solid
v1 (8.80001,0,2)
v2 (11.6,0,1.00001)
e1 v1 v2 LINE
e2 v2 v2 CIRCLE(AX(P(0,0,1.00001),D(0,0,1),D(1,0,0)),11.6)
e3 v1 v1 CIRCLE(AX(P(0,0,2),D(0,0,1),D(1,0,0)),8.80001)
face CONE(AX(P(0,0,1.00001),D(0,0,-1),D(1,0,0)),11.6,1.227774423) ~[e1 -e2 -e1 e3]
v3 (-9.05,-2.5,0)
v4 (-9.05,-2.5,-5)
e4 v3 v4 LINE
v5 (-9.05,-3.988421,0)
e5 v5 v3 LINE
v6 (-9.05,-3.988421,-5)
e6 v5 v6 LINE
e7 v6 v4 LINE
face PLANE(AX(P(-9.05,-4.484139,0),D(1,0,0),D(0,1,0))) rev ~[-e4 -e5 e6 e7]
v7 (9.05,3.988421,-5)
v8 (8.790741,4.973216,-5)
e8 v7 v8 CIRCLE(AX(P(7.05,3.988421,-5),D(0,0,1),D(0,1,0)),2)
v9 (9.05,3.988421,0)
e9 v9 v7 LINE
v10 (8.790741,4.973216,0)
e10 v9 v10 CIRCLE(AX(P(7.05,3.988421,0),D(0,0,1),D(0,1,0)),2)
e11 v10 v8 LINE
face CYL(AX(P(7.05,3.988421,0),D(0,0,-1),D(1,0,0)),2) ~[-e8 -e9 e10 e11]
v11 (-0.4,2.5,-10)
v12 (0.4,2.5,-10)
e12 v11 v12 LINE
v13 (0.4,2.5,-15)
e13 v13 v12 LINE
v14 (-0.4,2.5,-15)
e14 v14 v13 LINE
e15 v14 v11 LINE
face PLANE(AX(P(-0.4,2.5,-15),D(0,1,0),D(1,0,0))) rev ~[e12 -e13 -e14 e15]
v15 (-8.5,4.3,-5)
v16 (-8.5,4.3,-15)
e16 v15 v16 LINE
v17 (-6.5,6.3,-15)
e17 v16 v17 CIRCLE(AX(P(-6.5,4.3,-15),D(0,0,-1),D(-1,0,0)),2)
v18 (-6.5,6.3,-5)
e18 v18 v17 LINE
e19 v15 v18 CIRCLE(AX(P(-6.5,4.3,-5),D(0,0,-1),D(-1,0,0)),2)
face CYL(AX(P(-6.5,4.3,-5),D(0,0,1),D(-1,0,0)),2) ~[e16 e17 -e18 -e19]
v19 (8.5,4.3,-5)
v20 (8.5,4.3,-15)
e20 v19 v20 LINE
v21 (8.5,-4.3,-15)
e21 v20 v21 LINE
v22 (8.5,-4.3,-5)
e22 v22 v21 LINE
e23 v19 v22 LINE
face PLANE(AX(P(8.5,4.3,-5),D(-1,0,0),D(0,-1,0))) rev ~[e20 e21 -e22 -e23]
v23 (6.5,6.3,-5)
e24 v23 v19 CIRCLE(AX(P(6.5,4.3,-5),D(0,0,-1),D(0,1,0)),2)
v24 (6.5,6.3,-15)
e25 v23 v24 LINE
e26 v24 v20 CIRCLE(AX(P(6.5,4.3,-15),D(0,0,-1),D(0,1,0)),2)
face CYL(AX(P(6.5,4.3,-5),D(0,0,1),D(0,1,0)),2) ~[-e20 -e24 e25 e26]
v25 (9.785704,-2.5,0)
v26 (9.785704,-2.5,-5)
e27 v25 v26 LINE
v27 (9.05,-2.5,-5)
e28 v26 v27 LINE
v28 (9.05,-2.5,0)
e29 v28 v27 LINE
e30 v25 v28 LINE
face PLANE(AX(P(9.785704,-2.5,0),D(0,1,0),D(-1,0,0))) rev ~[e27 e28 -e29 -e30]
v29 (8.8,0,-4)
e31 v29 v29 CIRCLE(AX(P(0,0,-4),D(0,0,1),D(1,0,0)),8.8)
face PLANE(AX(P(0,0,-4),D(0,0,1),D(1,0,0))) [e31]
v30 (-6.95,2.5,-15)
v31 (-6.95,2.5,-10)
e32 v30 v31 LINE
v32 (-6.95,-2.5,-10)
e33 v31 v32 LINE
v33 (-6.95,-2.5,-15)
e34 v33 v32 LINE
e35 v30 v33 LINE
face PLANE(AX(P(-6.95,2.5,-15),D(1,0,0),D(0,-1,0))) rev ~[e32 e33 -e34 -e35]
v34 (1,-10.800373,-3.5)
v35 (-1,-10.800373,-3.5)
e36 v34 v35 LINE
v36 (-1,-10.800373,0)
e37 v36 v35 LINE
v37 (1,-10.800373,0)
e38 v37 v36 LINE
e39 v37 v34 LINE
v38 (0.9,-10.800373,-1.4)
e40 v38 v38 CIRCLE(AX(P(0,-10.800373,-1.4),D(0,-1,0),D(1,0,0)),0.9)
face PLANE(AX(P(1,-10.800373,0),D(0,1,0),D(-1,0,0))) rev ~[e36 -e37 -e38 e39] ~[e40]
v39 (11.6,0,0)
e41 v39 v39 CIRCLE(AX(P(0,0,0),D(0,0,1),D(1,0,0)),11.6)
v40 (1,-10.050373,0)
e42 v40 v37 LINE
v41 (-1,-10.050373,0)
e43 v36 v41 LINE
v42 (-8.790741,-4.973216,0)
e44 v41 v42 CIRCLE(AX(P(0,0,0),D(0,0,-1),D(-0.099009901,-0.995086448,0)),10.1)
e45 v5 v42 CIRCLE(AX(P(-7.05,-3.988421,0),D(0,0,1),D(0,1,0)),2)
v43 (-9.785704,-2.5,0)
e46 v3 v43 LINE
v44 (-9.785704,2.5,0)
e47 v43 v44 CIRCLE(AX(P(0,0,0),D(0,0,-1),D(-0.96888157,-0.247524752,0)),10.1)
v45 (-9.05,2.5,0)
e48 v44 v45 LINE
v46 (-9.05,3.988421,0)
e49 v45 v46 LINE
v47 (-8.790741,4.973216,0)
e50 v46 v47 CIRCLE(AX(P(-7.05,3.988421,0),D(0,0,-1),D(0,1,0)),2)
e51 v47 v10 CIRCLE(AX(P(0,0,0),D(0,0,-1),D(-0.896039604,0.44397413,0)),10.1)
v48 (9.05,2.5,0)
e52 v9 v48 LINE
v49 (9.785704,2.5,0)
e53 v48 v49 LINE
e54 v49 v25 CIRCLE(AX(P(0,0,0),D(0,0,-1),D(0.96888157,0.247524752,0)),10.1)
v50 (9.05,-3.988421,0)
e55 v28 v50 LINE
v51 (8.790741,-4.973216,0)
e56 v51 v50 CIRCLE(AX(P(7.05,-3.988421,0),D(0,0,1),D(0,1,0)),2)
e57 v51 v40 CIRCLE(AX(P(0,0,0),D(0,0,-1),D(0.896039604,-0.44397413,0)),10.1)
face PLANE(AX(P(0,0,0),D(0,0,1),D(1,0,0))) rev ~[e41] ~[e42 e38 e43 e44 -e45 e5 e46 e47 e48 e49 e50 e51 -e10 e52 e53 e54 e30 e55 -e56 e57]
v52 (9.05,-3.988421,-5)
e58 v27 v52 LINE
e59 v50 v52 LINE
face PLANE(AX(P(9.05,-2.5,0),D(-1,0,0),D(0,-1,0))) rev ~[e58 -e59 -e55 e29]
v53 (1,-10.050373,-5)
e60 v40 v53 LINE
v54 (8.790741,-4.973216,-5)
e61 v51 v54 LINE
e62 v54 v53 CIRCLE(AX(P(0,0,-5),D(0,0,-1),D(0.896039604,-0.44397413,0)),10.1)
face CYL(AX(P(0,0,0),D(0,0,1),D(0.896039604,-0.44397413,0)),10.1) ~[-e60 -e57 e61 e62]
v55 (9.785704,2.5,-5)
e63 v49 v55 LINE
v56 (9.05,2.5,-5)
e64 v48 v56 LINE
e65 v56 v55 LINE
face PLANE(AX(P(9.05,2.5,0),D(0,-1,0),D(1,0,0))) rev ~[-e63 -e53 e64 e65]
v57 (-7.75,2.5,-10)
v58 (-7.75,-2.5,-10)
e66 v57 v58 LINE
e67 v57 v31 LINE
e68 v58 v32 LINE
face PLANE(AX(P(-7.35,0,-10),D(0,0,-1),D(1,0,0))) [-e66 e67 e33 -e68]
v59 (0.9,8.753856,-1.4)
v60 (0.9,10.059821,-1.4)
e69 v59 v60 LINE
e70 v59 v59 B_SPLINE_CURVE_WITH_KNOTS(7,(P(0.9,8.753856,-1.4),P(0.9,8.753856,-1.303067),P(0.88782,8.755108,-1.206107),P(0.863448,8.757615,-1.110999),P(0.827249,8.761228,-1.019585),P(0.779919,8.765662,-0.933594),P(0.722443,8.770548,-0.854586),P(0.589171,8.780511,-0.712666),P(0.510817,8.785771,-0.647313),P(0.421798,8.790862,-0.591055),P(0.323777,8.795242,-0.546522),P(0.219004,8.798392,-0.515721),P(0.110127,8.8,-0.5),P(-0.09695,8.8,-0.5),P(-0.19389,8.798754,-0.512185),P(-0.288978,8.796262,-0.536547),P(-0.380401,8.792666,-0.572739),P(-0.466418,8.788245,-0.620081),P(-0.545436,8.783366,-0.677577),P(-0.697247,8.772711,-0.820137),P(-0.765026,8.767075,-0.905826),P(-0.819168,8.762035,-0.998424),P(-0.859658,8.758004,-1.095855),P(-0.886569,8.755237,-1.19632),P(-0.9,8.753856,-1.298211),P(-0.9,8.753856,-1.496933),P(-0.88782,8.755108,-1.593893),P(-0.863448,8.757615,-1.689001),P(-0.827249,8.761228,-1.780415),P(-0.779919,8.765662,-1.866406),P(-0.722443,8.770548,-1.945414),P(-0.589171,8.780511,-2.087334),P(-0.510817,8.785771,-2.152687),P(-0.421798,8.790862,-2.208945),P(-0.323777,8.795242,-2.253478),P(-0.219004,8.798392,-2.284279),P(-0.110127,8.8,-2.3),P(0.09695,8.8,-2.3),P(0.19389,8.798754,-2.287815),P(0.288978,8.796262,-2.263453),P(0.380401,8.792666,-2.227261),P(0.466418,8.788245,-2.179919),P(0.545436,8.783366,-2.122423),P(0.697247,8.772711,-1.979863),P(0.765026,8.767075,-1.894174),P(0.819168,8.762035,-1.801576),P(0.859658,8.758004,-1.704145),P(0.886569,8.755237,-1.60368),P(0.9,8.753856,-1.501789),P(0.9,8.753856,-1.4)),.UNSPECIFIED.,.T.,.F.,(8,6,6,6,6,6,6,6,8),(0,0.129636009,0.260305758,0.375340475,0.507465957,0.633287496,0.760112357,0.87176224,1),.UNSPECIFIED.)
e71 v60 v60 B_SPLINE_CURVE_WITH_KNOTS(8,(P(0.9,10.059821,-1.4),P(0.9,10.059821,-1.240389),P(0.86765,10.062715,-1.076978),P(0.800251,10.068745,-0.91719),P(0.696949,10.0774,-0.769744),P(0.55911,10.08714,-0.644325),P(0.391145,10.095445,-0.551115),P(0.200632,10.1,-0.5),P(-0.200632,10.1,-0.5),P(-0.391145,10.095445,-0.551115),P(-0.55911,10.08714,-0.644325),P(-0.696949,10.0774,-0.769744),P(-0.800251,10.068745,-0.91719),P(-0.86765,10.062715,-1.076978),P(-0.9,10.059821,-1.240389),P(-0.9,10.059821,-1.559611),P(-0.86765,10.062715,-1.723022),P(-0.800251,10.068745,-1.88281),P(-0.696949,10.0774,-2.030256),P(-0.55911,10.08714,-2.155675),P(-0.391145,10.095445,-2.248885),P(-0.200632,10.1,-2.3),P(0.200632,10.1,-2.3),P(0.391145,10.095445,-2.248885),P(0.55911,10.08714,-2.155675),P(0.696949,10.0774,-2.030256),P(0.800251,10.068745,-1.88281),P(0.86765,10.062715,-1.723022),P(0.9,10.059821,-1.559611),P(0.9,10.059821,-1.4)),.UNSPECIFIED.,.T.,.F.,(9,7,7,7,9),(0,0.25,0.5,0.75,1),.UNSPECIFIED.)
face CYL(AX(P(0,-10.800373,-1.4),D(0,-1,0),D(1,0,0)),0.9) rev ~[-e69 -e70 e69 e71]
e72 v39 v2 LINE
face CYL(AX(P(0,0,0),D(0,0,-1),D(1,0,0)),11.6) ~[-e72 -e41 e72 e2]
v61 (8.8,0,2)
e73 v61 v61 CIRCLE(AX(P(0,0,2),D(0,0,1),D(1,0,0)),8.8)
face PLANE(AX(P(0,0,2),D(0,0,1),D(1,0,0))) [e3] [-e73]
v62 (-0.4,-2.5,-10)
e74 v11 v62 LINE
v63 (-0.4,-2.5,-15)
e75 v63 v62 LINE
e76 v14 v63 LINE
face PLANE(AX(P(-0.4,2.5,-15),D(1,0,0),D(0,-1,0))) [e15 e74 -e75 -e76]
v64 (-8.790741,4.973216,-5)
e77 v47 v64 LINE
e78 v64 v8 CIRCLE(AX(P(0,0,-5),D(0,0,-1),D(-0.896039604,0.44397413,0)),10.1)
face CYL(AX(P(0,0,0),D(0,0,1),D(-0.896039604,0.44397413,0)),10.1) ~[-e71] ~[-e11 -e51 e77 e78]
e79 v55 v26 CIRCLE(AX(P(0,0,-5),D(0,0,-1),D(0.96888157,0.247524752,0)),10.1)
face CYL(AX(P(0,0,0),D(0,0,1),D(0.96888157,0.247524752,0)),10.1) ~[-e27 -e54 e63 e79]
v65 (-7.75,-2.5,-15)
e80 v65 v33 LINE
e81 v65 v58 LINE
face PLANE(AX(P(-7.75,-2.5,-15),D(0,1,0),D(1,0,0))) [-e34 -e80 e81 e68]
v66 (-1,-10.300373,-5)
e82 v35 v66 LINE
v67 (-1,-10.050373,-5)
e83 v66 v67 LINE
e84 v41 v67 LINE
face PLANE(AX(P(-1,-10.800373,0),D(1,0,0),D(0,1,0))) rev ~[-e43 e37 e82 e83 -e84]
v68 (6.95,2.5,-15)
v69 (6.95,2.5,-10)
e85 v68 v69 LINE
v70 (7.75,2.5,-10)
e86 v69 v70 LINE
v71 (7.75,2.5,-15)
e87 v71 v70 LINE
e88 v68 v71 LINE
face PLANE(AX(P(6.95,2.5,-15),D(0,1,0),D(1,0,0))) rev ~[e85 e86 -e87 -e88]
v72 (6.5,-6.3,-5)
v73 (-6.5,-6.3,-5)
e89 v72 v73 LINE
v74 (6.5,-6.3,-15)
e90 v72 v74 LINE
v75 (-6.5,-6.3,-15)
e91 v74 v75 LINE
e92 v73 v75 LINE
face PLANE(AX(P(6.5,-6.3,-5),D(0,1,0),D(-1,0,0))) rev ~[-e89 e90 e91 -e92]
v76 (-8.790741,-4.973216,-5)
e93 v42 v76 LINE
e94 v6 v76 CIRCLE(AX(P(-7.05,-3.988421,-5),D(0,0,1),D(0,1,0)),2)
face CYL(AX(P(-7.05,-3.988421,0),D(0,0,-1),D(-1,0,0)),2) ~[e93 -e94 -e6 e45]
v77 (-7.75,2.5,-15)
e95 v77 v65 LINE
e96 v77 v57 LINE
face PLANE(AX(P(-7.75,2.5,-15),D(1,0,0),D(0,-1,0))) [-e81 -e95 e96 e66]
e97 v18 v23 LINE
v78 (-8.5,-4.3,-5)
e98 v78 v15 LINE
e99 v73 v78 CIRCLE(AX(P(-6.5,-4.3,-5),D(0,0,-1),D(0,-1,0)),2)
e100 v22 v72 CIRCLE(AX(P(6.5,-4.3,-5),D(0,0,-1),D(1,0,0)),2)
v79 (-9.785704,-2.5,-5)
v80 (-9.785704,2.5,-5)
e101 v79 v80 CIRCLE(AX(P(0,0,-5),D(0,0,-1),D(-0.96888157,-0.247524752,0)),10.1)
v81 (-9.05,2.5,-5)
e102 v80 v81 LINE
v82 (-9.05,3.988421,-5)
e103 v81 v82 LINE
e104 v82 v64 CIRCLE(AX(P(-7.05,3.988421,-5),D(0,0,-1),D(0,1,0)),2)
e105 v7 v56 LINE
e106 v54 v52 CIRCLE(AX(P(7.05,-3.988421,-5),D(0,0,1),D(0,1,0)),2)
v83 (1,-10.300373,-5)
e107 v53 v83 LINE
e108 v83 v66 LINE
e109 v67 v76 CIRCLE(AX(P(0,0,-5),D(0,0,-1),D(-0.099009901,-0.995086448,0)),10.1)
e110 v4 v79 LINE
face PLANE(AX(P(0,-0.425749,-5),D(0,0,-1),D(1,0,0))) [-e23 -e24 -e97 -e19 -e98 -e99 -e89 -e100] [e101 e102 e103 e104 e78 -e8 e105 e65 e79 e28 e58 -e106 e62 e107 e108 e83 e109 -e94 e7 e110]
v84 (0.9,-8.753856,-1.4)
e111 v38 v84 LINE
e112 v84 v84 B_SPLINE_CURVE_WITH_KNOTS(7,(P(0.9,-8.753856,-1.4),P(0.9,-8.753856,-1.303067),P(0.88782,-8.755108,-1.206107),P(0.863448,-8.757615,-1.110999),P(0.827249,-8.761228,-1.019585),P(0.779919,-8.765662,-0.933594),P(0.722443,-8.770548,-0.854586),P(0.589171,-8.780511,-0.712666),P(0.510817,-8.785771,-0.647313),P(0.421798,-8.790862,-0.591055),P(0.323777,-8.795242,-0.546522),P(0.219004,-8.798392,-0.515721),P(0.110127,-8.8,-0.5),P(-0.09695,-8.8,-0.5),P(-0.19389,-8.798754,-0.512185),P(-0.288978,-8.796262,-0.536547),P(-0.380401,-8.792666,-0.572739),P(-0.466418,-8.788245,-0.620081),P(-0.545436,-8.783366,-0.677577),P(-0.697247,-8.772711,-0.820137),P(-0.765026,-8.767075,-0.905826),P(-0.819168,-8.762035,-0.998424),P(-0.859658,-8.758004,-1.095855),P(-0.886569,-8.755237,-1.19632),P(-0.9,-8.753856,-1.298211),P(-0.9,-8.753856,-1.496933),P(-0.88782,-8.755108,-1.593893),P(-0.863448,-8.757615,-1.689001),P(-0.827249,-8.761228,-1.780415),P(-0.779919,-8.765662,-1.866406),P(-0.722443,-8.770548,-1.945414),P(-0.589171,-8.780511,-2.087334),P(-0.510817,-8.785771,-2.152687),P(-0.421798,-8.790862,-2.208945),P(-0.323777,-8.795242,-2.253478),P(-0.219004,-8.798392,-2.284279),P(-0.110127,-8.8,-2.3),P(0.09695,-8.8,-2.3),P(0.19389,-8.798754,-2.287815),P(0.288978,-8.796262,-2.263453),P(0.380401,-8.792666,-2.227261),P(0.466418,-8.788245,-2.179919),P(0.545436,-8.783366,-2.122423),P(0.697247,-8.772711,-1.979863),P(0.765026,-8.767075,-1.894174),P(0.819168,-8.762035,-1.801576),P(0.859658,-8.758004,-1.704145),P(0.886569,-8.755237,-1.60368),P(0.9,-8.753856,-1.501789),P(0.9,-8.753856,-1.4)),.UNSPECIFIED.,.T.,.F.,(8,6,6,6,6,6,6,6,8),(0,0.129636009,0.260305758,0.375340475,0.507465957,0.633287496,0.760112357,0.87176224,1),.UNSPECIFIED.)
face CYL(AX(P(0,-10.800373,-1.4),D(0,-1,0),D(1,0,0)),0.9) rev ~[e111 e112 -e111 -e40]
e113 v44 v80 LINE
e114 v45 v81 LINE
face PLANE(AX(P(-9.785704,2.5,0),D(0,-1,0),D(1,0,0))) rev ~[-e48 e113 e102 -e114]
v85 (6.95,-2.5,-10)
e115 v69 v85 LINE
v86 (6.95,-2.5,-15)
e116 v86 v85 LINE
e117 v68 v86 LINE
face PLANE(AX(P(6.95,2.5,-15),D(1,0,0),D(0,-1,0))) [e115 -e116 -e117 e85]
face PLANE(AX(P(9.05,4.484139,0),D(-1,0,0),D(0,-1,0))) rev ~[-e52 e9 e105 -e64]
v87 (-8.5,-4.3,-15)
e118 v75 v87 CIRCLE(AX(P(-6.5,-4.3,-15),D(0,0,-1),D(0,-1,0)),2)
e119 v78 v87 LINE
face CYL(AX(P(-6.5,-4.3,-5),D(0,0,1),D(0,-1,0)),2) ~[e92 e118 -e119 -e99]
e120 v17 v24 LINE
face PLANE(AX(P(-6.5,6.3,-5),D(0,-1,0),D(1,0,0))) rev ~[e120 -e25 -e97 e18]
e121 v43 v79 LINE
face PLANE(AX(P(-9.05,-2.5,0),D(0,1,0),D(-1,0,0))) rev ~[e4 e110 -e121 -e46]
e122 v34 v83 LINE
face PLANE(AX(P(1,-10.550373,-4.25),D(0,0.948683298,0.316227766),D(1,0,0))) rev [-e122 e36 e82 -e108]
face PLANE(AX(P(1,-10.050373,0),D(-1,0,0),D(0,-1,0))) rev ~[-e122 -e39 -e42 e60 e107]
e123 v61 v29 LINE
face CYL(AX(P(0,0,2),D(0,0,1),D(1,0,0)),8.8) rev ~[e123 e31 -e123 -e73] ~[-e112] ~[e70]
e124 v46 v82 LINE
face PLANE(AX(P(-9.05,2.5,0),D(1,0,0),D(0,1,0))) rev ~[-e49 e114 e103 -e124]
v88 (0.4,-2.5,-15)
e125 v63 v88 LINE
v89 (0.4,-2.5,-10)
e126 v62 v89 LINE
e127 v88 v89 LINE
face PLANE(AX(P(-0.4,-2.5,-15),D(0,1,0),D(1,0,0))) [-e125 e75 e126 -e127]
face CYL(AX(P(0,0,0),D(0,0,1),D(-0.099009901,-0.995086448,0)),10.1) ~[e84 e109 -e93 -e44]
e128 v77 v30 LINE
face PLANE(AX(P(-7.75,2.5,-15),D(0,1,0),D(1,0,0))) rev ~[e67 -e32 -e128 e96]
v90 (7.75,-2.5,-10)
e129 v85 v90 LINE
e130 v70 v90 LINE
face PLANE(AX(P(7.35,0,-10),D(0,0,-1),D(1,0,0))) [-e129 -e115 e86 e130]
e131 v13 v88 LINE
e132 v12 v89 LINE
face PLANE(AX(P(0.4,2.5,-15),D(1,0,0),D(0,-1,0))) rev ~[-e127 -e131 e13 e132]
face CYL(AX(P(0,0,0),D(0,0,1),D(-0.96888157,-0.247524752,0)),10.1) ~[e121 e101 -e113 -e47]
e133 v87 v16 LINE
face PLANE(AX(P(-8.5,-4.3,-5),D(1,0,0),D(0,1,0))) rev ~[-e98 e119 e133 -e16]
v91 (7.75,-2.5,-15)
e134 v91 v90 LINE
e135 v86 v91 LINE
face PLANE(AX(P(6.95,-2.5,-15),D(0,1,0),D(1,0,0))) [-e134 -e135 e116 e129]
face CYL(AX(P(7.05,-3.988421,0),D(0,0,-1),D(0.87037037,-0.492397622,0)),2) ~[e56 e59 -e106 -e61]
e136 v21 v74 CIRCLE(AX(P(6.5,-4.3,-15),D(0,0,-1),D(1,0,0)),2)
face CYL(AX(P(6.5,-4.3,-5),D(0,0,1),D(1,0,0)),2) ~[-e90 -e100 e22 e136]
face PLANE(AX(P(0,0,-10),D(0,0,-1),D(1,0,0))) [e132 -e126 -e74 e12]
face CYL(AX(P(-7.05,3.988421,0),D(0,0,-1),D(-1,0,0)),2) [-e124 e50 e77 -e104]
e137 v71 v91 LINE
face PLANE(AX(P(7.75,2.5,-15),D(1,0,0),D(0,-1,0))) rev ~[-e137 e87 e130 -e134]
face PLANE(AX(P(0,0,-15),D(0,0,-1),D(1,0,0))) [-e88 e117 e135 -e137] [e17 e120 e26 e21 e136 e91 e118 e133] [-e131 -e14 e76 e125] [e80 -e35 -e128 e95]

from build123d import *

# Parameters (mm, degrees)
F0_R      = 11.6
F1_DEPTH  = 2
F3_DEPTH  = 5
F5_DEPTH  = 10
F6_W      = 0.8
F6_H      = 5
F7_DEPTH  = 5
F8_R      = 8.8
F9_DEPTH  = 6
F10_SIZE2 = 0.99999
F10_SIZE  = 2.79999
F11_R     = 2
F12_SIZE2 = 0.5
F12_SIZE  = 1.5
F13_R     = 0.9
F14_DEPTH = 22.4013731274


# Not quite as in the source:
# - a fillet or chamfer is up to 0.001 mm smaller than in the source, because OpenCascade refuses the exact size


with BuildPart() as f1:
    # F0 (on Top) → F1 (new body)
    with BuildSketch(Plane.XY):
        Circle(F0_R)
    extrude(amount=F1_DEPTH)

    # F2 (on face) → F3 (join)
    with BuildSketch(Plane(origin=(0, 0, 0), x_dir=(1, 0, 0), z_dir=(0, 0, -1))):
        with BuildLine():
            Line((-9.05, -2.5), (-9.05, -4.4841387133))
            ThreePointArc((-9.05, -4.4841387133), (0, -10.1), (9.05, -4.4841387133))
            Line((9.05, -4.4841387133), (9.05, -2.5))
            Line((9.05, -2.5), (9.05, 2.5))
            Line((9.05, 2.5), (9.05, 4.4841387133))
            ThreePointArc((9.05, 4.4841387133), (5.7442463725, 8.3074444694), (1, 10.0503731274))
            Line((1, 10.0503731274), (1, 10.8003731274))
            Line((1, 10.8003731274), (-1, 10.8003731274))
            Line((-1, 10.8003731274), (-1, 10.0503731274))
            ThreePointArc((-1, 10.0503731274), (-5.7442463725, 8.3074444694), (-9.05, 4.4841387133))
            Line((-9.05, 4.4841387133), (-9.05, 2.5))
            Line((-9.05, 2.5), (-9.05, -2.5))
        make_face()
        with BuildLine():
            Line((-9.7857038582, -2.5), (-9.05, -2.5))
            Line((-9.05, -2.5), (-9.05, 2.5))
            Line((-9.05, 2.5), (-9.7857038582, 2.5))
            ThreePointArc((-9.7857038582, 2.5), (-10.1, 0), (-9.7857038582, -2.5))
        make_face()
        with BuildLine():
            Line((9.05, 2.5), (9.05, -2.5))
            Line((9.05, -2.5), (9.7857038582, -2.5))
            ThreePointArc((9.7857038582, -2.5), (10.1, 0), (9.7857038582, 2.5))
            Line((9.7857038582, 2.5), (9.05, 2.5))
        make_face()
    extrude(amount=F3_DEPTH)

    # F4 (on face) → F5 (join)
    with BuildSketch(Plane(origin=(0, 0, -5), x_dir=(1, 0, 0), z_dir=(0, 0, -1))):
        with BuildLine():
            Line((6.5, 6.3), (-6.5, 6.3))
            ThreePointArc((-6.5, 6.3), (-7.9142135624, 5.7142135624), (-8.5, 4.3))
            Line((-8.5, 4.3), (-8.5, -4.3))
            ThreePointArc((-8.5, -4.3), (-7.9142135624, -5.7142135624), (-6.5, -6.3))
            Line((-6.5, -6.3), (6.5, -6.3))
            ThreePointArc((6.5, -6.3), (7.9142135624, -5.7142135624), (8.5, -4.3))
            Line((8.5, -4.3), (8.5, 4.3))
            ThreePointArc((8.5, 4.3), (7.9142135624, 5.7142135624), (6.5, 6.3))
        make_face()
    extrude(amount=F5_DEPTH)

    # F6 (on face) → F7 (cut)
    with BuildSketch(Plane(origin=(0, 0, -15), x_dir=(1, 0, 0), z_dir=(0, 0, -1))):
        Rectangle(F6_W, F6_H)
        with Locations((-7.35, 0)):
            Rectangle(F6_W, F6_H)
        with Locations((7.35, 0)):
            Rectangle(F6_W, F6_H)
    extrude(amount=-F7_DEPTH, mode=Mode.SUBTRACT)

    # F8 (on face) → F9 (cut)
    with BuildSketch(Plane.XY.offset(2)):
        Circle(F8_R)
    extrude(amount=-F9_DEPTH, mode=Mode.SUBTRACT)

    # F10 (size 2.8 and 1 in the source; OpenCascade refuses exactly that, so slightly less here)
    f10_edges = [f1.edges().sort_by_distance(p)[0] for p in [
        (-11.6, 0, 2),
    ]]
    f10_side = f1.faces().sort_by_distance((-11.271902, 0, 2))[0]
    chamfer(f10_edges, length=F10_SIZE, length2=F10_SIZE2, reference=f10_side)

    # F11
    f11_edges = [f1.edges().sort_by_distance(p)[0] for p in [
        (-9.05, 4.484139, -2.5),
        (-9.05, -4.484139, -2.5),
        (9.05, -4.484139, -2.5),
        (9.05, 4.484139, -2.5),
    ]]
    fillet(f11_edges, radius=F11_R)

    # F12
    f12_edges = [f1.edges().sort_by_distance(p)[0] for p in [
        (0, -10.800373, -5),
    ]]
    f12_side = f1.faces().sort_by_distance((0, -10.800373, -2.5))[0]
    chamfer(f12_edges, length=F12_SIZE, length2=F12_SIZE2, reference=f12_side)

    # F13 (on face) → F14 (cut, through all)
    with BuildSketch(Plane.XZ.offset(10.8003731274)):
        with Locations((0, -1.4)):
            Circle(F13_R)
    extrude(amount=-F14_DEPTH, mode=Mode.SUBTRACT)


solid = f1.part
